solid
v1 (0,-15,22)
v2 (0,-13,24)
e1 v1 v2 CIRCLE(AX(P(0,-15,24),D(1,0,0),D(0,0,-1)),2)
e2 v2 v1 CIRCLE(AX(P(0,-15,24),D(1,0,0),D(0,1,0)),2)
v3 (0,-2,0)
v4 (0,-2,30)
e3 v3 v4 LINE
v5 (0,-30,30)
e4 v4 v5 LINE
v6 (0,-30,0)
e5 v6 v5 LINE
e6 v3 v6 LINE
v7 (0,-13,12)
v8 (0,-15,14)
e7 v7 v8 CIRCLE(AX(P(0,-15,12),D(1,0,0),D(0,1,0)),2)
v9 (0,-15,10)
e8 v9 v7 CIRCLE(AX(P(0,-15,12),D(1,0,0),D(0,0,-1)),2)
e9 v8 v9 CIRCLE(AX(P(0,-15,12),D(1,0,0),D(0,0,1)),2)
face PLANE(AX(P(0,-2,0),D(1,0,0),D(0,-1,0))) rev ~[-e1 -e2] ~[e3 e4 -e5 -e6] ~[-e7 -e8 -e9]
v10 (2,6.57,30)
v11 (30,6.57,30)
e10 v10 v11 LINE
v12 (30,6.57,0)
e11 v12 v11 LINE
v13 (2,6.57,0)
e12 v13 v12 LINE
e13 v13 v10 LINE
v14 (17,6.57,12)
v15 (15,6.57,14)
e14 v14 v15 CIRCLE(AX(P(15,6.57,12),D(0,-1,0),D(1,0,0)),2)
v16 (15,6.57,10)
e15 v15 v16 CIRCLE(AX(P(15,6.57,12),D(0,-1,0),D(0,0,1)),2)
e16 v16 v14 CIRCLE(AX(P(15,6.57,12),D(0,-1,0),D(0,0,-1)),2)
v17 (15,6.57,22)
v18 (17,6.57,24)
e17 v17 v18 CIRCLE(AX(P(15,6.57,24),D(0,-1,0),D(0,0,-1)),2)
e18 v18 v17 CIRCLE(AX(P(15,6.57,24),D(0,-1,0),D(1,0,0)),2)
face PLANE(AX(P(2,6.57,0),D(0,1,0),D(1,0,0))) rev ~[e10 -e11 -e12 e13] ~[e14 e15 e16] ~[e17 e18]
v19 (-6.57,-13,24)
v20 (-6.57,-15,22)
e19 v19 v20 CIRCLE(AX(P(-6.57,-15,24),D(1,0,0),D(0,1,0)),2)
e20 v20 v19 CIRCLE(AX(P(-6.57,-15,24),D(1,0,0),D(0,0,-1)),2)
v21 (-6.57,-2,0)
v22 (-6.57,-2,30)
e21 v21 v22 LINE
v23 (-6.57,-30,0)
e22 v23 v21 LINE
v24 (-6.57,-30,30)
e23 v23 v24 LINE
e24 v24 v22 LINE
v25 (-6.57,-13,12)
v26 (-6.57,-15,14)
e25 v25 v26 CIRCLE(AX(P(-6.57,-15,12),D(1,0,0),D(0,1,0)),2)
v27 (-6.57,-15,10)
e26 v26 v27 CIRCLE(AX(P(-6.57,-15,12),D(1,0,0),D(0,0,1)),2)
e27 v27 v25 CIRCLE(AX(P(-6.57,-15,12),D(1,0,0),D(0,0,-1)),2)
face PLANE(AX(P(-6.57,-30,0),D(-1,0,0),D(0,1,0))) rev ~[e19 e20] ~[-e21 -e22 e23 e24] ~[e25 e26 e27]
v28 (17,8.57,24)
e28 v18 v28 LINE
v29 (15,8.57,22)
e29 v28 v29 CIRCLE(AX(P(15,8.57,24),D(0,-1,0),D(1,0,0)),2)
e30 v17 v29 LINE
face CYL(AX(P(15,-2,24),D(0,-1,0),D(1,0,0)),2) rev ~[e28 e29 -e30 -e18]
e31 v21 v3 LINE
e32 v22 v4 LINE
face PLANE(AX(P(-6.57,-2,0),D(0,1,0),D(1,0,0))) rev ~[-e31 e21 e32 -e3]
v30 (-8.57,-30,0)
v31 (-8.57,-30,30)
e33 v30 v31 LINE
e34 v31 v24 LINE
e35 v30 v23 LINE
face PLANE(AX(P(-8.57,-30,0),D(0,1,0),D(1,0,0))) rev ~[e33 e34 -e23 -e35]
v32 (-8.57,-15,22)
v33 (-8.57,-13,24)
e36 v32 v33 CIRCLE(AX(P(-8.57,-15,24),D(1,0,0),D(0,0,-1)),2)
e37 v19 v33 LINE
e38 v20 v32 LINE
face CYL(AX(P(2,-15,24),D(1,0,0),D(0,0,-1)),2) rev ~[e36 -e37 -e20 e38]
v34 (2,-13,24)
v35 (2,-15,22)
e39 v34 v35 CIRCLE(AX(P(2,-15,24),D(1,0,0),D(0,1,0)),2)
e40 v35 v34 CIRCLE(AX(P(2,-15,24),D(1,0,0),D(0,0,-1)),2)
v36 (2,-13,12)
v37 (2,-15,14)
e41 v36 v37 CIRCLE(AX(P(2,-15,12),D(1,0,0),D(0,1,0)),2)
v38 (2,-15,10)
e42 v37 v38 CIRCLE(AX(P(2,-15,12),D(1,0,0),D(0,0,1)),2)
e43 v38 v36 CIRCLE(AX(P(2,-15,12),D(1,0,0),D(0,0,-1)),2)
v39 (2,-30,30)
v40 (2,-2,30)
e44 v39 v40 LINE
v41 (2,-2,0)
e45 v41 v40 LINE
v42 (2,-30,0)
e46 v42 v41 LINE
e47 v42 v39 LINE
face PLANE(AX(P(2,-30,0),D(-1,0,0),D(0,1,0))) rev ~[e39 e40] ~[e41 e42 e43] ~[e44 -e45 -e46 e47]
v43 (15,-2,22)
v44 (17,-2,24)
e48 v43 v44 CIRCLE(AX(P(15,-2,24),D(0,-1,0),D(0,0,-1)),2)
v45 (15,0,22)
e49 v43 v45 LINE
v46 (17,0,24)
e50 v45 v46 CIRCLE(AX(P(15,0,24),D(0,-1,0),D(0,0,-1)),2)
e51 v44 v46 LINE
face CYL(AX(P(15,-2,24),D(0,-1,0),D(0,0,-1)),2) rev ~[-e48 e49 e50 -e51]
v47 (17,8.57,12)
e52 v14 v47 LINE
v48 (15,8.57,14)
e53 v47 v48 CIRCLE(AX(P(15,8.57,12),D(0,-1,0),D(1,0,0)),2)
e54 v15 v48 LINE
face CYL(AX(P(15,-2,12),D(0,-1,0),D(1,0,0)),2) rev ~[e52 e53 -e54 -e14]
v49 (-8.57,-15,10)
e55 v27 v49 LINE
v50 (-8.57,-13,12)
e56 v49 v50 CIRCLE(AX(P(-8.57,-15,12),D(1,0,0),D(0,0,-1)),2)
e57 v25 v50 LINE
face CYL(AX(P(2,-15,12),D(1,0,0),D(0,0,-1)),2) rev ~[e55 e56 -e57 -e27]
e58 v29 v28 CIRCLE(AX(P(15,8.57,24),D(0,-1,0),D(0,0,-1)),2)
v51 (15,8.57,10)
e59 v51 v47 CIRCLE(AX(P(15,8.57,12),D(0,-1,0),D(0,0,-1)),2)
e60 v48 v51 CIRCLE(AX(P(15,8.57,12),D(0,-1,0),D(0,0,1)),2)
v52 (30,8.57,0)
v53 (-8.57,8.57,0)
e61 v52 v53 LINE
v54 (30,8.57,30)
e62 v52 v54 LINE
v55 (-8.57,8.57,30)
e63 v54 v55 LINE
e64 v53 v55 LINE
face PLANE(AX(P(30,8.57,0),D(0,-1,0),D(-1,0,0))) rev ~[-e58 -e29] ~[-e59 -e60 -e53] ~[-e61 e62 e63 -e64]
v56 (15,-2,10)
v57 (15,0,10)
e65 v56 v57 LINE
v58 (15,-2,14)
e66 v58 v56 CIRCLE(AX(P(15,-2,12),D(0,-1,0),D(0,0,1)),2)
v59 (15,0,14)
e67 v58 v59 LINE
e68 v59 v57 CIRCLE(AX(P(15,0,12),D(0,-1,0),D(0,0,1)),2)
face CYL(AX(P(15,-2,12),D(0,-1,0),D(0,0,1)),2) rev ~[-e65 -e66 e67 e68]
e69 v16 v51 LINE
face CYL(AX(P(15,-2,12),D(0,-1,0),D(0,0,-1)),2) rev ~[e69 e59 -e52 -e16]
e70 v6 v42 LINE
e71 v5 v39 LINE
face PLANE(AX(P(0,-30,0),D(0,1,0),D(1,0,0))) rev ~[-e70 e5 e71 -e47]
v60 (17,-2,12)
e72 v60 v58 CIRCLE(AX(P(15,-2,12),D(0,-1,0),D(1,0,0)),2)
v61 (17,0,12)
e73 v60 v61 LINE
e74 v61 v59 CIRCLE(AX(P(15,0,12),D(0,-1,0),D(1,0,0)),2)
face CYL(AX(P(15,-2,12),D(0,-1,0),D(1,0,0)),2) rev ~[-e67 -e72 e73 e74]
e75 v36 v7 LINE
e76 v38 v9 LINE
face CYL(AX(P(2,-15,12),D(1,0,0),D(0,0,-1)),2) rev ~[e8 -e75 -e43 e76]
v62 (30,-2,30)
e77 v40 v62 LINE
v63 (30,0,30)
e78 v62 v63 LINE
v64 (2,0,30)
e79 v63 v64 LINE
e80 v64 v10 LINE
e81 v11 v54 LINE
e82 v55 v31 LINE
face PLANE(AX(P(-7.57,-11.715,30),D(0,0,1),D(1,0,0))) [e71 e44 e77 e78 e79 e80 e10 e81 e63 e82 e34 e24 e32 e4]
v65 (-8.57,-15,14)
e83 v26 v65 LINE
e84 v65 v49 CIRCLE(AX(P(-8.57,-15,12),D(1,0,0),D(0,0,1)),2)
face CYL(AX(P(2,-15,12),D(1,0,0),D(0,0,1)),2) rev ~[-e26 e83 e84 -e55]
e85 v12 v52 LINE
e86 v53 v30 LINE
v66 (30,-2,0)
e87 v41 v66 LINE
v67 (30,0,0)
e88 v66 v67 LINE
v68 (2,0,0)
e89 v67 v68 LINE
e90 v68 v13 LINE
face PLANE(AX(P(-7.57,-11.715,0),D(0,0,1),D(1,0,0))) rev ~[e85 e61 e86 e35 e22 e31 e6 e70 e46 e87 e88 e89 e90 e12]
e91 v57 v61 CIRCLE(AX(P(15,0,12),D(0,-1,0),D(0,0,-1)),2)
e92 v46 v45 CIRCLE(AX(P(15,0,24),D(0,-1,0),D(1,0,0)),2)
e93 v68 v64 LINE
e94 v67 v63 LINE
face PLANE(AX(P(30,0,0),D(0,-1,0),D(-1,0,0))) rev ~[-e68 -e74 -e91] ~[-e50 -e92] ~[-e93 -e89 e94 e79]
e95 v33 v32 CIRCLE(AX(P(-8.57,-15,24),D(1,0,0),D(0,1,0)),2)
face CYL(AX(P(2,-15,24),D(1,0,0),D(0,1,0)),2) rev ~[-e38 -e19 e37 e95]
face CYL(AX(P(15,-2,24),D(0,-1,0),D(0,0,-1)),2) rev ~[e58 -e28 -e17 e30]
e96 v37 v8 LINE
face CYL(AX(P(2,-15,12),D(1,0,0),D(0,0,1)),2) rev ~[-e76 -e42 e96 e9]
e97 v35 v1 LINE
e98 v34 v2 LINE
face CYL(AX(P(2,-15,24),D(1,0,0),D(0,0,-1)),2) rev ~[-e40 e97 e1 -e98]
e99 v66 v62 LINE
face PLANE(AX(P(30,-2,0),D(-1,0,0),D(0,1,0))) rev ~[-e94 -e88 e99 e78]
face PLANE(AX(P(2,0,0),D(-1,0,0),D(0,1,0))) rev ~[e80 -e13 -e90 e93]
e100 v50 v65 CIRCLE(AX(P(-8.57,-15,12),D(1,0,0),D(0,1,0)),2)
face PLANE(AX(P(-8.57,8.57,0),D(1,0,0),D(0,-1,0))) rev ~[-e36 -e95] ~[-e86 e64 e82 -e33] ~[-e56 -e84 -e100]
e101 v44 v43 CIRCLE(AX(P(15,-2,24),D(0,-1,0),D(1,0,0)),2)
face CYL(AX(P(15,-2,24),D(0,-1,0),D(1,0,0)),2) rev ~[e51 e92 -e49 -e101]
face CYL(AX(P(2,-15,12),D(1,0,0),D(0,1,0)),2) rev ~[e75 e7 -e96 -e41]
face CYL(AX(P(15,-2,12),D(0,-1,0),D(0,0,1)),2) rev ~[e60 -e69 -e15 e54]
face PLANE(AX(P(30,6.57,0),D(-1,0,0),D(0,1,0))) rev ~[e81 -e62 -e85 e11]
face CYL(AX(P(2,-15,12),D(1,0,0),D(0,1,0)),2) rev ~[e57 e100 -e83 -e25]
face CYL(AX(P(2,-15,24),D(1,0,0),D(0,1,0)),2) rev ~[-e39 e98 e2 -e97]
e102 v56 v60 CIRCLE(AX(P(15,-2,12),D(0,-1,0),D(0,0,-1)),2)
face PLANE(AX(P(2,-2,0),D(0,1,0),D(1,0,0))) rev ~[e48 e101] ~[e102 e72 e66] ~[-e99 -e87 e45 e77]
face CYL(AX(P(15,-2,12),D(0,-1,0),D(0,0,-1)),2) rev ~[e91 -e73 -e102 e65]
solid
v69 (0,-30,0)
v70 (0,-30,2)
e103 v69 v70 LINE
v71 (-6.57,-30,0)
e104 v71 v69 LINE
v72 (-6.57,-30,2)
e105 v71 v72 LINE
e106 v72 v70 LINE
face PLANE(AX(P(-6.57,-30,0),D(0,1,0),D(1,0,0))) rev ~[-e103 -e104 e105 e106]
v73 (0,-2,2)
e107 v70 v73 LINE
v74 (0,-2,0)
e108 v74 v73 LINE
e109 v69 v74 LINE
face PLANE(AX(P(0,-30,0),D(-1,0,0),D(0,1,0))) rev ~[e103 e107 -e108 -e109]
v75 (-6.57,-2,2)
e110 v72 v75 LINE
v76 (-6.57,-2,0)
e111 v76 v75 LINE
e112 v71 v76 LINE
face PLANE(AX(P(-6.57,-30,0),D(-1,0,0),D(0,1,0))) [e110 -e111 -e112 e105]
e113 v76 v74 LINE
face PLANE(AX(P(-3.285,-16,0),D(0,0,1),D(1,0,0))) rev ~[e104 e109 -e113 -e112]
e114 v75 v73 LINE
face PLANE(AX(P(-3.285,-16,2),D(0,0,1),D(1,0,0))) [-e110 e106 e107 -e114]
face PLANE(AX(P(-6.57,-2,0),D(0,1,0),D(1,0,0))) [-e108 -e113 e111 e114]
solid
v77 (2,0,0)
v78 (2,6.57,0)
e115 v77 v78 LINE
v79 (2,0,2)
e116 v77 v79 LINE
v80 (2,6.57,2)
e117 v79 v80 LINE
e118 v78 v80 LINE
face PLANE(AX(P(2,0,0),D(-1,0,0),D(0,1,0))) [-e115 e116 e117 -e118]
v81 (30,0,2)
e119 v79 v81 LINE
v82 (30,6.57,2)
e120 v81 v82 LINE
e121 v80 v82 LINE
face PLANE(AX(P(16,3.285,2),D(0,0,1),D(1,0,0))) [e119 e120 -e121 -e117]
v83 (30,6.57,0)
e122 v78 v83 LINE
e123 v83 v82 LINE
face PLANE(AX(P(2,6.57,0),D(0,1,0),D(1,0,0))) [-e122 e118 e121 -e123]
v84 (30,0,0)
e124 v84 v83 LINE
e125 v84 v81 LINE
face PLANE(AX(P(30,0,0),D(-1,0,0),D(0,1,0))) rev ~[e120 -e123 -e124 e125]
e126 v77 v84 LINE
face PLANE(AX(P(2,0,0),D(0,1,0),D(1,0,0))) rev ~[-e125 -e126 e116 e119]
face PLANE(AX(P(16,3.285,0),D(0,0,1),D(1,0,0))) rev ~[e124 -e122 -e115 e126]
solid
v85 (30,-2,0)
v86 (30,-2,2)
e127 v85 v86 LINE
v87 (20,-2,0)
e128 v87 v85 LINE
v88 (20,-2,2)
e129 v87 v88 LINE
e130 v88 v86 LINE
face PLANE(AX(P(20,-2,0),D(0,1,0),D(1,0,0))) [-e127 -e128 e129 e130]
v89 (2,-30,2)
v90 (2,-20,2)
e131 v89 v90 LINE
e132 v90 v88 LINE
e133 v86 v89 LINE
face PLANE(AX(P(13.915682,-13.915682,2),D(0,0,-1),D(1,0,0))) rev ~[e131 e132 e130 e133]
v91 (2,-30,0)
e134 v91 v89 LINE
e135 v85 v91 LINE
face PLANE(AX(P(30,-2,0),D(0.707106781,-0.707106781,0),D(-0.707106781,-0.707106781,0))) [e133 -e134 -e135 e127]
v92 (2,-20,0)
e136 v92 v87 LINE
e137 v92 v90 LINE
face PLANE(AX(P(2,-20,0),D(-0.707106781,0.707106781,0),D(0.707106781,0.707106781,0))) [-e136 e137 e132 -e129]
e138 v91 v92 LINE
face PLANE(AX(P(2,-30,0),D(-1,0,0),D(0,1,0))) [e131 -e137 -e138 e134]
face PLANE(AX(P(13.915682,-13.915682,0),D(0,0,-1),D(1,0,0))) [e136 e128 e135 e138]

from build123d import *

# Parameters (mm, degrees)
F0_W     = 2
F0_H     = 2
F0_W_2   = 28
F0_H_2   = 28
F1_DEPTH = 30
F0_H_3   = 6.57
F2_DEPTH = 2
F0_W_3   = 6.57
F4_DEPTH = 2
F6_DEPTH = 20
F8_DEPTH = 25


# Not quite as in the source:
# - a feature names something its author has since deleted; it is built from what else it names


with BuildPart() as f1:
    # F0 (on Top) → F1 (new body)
    with BuildSketch(Plane.XY):
        Polygon((-6.57, -2), (-6.57, 6.57), (-8.57, 6.57), (-8.57, -30), (-6.57, -30), align=None)
        with Locations((-7.57, 7.57)):
            Rectangle(F0_W, F0_H)
        Polygon((2, 6.57), (30, 6.57), (30, 8.57), (-6.57, 8.57), (-6.57, 6.57), align=None)
        with Locations((16, -1)):
            Rectangle(F0_W_2, F0_H)
        with Locations((1, -16)):
            Rectangle(F0_W, F0_H_2)
        with Locations((1, -1)):
            Rectangle(F0_W, F0_H)
        Polygon((0, 0), (2, 0), (2, 6.57), (-6.57, 6.57), (-6.57, -2), (0, -2), align=None)
    extrude(amount=F1_DEPTH)


with BuildPart() as f2:
    # F0 (on Top) → F2 (new body)
    with BuildSketch(Plane.XY):
        with Locations((16, 3.285)):
            Rectangle(F0_W_2, F0_H_3)
    extrude(amount=F2_DEPTH)


with BuildPart() as f2b:
    # F0 (on Top) → F2, piece 2 (new body)
    with BuildSketch(Plane.XY):
        with Locations((-3.285, -16)):
            Rectangle(F0_W_3, F0_H_2)
    extrude(amount=F2_DEPTH)


with BuildPart() as f4:
    # F3 (on face) → F4 (new body)
    with BuildSketch(Plane(origin=(0, 0, 0), x_dir=(1, 0, 0), z_dir=(0, 0, -1))):
        Polygon((20, 2), (30, 2), (2, 30), (2, 20), align=None)
    extrude(amount=-F4_DEPTH)


with BuildPart() as f6:
    # F5 (on face) → F6 (new body)
    with BuildSketch(Plane.YZ.offset(2)):
        with BuildLine():
            ThreePointArc((-13, 24), (-16.4142135624, 25.4142135624), (-15, 22))
            ThreePointArc((-15, 22), (-13.5857864376, 22.5857864376), (-13, 24))
        make_face()
    extrude(amount=-F6_DEPTH)


with BuildPart() as f6b:
    # F5 (on face) → F6, piece 2 (new body)
    with BuildSketch(Plane.YZ.offset(2)):
        with BuildLine():
            Line((-15, 12), (-15, 10))
            ThreePointArc((-15, 10), (-13.5857864376, 10.5857864376), (-13, 12))
            ThreePointArc((-13, 12), (-13.5857864376, 13.4142135624), (-15, 14))
            Line((-15, 14), (-15, 12))
        make_face()
        with BuildLine():
            ThreePointArc((-15, 14), (-17, 12), (-15, 10))
            Line((-15, 10), (-15, 12))
            Line((-15, 12), (-15, 14))
        make_face()
    extrude(amount=-F6_DEPTH)


with BuildPart() as f8:
    # F7 (on face) → F8 (new body)
    with BuildSketch(Plane.XZ.offset(2)):
        with BuildLine():
            ThreePointArc((17, 24), (13.5857864376, 25.4142135624), (15, 22))
            ThreePointArc((15, 22), (16.4142135624, 22.5857864376), (17, 24))
        make_face()
    extrude(amount=-F8_DEPTH)


with BuildPart() as f8b:
    # F7 (on face) → F8, piece 2 (new body)
    with BuildSketch(Plane.XZ.offset(2)):
        with BuildLine():
            ThreePointArc((15, 14), (13, 12), (15, 10))
            Line((15, 10), (15, 12))
            Line((15, 12), (15, 14))
        make_face()
        with BuildLine():
            Line((15, 12), (15, 10))
            ThreePointArc((15, 10), (16.4142135624, 10.5857864376), (17, 12))
            ThreePointArc((17, 12), (16.4142135624, 13.4142135624), (15, 14))
            Line((15, 14), (15, 12))
        make_face()
    extrude(amount=-F8_DEPTH)


with BuildPart() as f1_1:
    add(f1.part)

    # F9: cut F8, F6, F6b, F8b
    add(f8.part, mode=Mode.SUBTRACT)
    add(f6.part, mode=Mode.SUBTRACT)
    add(f6b.part, mode=Mode.SUBTRACT)
    add(f8b.part, mode=Mode.SUBTRACT)


solid = Compound([f2.part, f2b.part, f4.part, f1_1.part])
